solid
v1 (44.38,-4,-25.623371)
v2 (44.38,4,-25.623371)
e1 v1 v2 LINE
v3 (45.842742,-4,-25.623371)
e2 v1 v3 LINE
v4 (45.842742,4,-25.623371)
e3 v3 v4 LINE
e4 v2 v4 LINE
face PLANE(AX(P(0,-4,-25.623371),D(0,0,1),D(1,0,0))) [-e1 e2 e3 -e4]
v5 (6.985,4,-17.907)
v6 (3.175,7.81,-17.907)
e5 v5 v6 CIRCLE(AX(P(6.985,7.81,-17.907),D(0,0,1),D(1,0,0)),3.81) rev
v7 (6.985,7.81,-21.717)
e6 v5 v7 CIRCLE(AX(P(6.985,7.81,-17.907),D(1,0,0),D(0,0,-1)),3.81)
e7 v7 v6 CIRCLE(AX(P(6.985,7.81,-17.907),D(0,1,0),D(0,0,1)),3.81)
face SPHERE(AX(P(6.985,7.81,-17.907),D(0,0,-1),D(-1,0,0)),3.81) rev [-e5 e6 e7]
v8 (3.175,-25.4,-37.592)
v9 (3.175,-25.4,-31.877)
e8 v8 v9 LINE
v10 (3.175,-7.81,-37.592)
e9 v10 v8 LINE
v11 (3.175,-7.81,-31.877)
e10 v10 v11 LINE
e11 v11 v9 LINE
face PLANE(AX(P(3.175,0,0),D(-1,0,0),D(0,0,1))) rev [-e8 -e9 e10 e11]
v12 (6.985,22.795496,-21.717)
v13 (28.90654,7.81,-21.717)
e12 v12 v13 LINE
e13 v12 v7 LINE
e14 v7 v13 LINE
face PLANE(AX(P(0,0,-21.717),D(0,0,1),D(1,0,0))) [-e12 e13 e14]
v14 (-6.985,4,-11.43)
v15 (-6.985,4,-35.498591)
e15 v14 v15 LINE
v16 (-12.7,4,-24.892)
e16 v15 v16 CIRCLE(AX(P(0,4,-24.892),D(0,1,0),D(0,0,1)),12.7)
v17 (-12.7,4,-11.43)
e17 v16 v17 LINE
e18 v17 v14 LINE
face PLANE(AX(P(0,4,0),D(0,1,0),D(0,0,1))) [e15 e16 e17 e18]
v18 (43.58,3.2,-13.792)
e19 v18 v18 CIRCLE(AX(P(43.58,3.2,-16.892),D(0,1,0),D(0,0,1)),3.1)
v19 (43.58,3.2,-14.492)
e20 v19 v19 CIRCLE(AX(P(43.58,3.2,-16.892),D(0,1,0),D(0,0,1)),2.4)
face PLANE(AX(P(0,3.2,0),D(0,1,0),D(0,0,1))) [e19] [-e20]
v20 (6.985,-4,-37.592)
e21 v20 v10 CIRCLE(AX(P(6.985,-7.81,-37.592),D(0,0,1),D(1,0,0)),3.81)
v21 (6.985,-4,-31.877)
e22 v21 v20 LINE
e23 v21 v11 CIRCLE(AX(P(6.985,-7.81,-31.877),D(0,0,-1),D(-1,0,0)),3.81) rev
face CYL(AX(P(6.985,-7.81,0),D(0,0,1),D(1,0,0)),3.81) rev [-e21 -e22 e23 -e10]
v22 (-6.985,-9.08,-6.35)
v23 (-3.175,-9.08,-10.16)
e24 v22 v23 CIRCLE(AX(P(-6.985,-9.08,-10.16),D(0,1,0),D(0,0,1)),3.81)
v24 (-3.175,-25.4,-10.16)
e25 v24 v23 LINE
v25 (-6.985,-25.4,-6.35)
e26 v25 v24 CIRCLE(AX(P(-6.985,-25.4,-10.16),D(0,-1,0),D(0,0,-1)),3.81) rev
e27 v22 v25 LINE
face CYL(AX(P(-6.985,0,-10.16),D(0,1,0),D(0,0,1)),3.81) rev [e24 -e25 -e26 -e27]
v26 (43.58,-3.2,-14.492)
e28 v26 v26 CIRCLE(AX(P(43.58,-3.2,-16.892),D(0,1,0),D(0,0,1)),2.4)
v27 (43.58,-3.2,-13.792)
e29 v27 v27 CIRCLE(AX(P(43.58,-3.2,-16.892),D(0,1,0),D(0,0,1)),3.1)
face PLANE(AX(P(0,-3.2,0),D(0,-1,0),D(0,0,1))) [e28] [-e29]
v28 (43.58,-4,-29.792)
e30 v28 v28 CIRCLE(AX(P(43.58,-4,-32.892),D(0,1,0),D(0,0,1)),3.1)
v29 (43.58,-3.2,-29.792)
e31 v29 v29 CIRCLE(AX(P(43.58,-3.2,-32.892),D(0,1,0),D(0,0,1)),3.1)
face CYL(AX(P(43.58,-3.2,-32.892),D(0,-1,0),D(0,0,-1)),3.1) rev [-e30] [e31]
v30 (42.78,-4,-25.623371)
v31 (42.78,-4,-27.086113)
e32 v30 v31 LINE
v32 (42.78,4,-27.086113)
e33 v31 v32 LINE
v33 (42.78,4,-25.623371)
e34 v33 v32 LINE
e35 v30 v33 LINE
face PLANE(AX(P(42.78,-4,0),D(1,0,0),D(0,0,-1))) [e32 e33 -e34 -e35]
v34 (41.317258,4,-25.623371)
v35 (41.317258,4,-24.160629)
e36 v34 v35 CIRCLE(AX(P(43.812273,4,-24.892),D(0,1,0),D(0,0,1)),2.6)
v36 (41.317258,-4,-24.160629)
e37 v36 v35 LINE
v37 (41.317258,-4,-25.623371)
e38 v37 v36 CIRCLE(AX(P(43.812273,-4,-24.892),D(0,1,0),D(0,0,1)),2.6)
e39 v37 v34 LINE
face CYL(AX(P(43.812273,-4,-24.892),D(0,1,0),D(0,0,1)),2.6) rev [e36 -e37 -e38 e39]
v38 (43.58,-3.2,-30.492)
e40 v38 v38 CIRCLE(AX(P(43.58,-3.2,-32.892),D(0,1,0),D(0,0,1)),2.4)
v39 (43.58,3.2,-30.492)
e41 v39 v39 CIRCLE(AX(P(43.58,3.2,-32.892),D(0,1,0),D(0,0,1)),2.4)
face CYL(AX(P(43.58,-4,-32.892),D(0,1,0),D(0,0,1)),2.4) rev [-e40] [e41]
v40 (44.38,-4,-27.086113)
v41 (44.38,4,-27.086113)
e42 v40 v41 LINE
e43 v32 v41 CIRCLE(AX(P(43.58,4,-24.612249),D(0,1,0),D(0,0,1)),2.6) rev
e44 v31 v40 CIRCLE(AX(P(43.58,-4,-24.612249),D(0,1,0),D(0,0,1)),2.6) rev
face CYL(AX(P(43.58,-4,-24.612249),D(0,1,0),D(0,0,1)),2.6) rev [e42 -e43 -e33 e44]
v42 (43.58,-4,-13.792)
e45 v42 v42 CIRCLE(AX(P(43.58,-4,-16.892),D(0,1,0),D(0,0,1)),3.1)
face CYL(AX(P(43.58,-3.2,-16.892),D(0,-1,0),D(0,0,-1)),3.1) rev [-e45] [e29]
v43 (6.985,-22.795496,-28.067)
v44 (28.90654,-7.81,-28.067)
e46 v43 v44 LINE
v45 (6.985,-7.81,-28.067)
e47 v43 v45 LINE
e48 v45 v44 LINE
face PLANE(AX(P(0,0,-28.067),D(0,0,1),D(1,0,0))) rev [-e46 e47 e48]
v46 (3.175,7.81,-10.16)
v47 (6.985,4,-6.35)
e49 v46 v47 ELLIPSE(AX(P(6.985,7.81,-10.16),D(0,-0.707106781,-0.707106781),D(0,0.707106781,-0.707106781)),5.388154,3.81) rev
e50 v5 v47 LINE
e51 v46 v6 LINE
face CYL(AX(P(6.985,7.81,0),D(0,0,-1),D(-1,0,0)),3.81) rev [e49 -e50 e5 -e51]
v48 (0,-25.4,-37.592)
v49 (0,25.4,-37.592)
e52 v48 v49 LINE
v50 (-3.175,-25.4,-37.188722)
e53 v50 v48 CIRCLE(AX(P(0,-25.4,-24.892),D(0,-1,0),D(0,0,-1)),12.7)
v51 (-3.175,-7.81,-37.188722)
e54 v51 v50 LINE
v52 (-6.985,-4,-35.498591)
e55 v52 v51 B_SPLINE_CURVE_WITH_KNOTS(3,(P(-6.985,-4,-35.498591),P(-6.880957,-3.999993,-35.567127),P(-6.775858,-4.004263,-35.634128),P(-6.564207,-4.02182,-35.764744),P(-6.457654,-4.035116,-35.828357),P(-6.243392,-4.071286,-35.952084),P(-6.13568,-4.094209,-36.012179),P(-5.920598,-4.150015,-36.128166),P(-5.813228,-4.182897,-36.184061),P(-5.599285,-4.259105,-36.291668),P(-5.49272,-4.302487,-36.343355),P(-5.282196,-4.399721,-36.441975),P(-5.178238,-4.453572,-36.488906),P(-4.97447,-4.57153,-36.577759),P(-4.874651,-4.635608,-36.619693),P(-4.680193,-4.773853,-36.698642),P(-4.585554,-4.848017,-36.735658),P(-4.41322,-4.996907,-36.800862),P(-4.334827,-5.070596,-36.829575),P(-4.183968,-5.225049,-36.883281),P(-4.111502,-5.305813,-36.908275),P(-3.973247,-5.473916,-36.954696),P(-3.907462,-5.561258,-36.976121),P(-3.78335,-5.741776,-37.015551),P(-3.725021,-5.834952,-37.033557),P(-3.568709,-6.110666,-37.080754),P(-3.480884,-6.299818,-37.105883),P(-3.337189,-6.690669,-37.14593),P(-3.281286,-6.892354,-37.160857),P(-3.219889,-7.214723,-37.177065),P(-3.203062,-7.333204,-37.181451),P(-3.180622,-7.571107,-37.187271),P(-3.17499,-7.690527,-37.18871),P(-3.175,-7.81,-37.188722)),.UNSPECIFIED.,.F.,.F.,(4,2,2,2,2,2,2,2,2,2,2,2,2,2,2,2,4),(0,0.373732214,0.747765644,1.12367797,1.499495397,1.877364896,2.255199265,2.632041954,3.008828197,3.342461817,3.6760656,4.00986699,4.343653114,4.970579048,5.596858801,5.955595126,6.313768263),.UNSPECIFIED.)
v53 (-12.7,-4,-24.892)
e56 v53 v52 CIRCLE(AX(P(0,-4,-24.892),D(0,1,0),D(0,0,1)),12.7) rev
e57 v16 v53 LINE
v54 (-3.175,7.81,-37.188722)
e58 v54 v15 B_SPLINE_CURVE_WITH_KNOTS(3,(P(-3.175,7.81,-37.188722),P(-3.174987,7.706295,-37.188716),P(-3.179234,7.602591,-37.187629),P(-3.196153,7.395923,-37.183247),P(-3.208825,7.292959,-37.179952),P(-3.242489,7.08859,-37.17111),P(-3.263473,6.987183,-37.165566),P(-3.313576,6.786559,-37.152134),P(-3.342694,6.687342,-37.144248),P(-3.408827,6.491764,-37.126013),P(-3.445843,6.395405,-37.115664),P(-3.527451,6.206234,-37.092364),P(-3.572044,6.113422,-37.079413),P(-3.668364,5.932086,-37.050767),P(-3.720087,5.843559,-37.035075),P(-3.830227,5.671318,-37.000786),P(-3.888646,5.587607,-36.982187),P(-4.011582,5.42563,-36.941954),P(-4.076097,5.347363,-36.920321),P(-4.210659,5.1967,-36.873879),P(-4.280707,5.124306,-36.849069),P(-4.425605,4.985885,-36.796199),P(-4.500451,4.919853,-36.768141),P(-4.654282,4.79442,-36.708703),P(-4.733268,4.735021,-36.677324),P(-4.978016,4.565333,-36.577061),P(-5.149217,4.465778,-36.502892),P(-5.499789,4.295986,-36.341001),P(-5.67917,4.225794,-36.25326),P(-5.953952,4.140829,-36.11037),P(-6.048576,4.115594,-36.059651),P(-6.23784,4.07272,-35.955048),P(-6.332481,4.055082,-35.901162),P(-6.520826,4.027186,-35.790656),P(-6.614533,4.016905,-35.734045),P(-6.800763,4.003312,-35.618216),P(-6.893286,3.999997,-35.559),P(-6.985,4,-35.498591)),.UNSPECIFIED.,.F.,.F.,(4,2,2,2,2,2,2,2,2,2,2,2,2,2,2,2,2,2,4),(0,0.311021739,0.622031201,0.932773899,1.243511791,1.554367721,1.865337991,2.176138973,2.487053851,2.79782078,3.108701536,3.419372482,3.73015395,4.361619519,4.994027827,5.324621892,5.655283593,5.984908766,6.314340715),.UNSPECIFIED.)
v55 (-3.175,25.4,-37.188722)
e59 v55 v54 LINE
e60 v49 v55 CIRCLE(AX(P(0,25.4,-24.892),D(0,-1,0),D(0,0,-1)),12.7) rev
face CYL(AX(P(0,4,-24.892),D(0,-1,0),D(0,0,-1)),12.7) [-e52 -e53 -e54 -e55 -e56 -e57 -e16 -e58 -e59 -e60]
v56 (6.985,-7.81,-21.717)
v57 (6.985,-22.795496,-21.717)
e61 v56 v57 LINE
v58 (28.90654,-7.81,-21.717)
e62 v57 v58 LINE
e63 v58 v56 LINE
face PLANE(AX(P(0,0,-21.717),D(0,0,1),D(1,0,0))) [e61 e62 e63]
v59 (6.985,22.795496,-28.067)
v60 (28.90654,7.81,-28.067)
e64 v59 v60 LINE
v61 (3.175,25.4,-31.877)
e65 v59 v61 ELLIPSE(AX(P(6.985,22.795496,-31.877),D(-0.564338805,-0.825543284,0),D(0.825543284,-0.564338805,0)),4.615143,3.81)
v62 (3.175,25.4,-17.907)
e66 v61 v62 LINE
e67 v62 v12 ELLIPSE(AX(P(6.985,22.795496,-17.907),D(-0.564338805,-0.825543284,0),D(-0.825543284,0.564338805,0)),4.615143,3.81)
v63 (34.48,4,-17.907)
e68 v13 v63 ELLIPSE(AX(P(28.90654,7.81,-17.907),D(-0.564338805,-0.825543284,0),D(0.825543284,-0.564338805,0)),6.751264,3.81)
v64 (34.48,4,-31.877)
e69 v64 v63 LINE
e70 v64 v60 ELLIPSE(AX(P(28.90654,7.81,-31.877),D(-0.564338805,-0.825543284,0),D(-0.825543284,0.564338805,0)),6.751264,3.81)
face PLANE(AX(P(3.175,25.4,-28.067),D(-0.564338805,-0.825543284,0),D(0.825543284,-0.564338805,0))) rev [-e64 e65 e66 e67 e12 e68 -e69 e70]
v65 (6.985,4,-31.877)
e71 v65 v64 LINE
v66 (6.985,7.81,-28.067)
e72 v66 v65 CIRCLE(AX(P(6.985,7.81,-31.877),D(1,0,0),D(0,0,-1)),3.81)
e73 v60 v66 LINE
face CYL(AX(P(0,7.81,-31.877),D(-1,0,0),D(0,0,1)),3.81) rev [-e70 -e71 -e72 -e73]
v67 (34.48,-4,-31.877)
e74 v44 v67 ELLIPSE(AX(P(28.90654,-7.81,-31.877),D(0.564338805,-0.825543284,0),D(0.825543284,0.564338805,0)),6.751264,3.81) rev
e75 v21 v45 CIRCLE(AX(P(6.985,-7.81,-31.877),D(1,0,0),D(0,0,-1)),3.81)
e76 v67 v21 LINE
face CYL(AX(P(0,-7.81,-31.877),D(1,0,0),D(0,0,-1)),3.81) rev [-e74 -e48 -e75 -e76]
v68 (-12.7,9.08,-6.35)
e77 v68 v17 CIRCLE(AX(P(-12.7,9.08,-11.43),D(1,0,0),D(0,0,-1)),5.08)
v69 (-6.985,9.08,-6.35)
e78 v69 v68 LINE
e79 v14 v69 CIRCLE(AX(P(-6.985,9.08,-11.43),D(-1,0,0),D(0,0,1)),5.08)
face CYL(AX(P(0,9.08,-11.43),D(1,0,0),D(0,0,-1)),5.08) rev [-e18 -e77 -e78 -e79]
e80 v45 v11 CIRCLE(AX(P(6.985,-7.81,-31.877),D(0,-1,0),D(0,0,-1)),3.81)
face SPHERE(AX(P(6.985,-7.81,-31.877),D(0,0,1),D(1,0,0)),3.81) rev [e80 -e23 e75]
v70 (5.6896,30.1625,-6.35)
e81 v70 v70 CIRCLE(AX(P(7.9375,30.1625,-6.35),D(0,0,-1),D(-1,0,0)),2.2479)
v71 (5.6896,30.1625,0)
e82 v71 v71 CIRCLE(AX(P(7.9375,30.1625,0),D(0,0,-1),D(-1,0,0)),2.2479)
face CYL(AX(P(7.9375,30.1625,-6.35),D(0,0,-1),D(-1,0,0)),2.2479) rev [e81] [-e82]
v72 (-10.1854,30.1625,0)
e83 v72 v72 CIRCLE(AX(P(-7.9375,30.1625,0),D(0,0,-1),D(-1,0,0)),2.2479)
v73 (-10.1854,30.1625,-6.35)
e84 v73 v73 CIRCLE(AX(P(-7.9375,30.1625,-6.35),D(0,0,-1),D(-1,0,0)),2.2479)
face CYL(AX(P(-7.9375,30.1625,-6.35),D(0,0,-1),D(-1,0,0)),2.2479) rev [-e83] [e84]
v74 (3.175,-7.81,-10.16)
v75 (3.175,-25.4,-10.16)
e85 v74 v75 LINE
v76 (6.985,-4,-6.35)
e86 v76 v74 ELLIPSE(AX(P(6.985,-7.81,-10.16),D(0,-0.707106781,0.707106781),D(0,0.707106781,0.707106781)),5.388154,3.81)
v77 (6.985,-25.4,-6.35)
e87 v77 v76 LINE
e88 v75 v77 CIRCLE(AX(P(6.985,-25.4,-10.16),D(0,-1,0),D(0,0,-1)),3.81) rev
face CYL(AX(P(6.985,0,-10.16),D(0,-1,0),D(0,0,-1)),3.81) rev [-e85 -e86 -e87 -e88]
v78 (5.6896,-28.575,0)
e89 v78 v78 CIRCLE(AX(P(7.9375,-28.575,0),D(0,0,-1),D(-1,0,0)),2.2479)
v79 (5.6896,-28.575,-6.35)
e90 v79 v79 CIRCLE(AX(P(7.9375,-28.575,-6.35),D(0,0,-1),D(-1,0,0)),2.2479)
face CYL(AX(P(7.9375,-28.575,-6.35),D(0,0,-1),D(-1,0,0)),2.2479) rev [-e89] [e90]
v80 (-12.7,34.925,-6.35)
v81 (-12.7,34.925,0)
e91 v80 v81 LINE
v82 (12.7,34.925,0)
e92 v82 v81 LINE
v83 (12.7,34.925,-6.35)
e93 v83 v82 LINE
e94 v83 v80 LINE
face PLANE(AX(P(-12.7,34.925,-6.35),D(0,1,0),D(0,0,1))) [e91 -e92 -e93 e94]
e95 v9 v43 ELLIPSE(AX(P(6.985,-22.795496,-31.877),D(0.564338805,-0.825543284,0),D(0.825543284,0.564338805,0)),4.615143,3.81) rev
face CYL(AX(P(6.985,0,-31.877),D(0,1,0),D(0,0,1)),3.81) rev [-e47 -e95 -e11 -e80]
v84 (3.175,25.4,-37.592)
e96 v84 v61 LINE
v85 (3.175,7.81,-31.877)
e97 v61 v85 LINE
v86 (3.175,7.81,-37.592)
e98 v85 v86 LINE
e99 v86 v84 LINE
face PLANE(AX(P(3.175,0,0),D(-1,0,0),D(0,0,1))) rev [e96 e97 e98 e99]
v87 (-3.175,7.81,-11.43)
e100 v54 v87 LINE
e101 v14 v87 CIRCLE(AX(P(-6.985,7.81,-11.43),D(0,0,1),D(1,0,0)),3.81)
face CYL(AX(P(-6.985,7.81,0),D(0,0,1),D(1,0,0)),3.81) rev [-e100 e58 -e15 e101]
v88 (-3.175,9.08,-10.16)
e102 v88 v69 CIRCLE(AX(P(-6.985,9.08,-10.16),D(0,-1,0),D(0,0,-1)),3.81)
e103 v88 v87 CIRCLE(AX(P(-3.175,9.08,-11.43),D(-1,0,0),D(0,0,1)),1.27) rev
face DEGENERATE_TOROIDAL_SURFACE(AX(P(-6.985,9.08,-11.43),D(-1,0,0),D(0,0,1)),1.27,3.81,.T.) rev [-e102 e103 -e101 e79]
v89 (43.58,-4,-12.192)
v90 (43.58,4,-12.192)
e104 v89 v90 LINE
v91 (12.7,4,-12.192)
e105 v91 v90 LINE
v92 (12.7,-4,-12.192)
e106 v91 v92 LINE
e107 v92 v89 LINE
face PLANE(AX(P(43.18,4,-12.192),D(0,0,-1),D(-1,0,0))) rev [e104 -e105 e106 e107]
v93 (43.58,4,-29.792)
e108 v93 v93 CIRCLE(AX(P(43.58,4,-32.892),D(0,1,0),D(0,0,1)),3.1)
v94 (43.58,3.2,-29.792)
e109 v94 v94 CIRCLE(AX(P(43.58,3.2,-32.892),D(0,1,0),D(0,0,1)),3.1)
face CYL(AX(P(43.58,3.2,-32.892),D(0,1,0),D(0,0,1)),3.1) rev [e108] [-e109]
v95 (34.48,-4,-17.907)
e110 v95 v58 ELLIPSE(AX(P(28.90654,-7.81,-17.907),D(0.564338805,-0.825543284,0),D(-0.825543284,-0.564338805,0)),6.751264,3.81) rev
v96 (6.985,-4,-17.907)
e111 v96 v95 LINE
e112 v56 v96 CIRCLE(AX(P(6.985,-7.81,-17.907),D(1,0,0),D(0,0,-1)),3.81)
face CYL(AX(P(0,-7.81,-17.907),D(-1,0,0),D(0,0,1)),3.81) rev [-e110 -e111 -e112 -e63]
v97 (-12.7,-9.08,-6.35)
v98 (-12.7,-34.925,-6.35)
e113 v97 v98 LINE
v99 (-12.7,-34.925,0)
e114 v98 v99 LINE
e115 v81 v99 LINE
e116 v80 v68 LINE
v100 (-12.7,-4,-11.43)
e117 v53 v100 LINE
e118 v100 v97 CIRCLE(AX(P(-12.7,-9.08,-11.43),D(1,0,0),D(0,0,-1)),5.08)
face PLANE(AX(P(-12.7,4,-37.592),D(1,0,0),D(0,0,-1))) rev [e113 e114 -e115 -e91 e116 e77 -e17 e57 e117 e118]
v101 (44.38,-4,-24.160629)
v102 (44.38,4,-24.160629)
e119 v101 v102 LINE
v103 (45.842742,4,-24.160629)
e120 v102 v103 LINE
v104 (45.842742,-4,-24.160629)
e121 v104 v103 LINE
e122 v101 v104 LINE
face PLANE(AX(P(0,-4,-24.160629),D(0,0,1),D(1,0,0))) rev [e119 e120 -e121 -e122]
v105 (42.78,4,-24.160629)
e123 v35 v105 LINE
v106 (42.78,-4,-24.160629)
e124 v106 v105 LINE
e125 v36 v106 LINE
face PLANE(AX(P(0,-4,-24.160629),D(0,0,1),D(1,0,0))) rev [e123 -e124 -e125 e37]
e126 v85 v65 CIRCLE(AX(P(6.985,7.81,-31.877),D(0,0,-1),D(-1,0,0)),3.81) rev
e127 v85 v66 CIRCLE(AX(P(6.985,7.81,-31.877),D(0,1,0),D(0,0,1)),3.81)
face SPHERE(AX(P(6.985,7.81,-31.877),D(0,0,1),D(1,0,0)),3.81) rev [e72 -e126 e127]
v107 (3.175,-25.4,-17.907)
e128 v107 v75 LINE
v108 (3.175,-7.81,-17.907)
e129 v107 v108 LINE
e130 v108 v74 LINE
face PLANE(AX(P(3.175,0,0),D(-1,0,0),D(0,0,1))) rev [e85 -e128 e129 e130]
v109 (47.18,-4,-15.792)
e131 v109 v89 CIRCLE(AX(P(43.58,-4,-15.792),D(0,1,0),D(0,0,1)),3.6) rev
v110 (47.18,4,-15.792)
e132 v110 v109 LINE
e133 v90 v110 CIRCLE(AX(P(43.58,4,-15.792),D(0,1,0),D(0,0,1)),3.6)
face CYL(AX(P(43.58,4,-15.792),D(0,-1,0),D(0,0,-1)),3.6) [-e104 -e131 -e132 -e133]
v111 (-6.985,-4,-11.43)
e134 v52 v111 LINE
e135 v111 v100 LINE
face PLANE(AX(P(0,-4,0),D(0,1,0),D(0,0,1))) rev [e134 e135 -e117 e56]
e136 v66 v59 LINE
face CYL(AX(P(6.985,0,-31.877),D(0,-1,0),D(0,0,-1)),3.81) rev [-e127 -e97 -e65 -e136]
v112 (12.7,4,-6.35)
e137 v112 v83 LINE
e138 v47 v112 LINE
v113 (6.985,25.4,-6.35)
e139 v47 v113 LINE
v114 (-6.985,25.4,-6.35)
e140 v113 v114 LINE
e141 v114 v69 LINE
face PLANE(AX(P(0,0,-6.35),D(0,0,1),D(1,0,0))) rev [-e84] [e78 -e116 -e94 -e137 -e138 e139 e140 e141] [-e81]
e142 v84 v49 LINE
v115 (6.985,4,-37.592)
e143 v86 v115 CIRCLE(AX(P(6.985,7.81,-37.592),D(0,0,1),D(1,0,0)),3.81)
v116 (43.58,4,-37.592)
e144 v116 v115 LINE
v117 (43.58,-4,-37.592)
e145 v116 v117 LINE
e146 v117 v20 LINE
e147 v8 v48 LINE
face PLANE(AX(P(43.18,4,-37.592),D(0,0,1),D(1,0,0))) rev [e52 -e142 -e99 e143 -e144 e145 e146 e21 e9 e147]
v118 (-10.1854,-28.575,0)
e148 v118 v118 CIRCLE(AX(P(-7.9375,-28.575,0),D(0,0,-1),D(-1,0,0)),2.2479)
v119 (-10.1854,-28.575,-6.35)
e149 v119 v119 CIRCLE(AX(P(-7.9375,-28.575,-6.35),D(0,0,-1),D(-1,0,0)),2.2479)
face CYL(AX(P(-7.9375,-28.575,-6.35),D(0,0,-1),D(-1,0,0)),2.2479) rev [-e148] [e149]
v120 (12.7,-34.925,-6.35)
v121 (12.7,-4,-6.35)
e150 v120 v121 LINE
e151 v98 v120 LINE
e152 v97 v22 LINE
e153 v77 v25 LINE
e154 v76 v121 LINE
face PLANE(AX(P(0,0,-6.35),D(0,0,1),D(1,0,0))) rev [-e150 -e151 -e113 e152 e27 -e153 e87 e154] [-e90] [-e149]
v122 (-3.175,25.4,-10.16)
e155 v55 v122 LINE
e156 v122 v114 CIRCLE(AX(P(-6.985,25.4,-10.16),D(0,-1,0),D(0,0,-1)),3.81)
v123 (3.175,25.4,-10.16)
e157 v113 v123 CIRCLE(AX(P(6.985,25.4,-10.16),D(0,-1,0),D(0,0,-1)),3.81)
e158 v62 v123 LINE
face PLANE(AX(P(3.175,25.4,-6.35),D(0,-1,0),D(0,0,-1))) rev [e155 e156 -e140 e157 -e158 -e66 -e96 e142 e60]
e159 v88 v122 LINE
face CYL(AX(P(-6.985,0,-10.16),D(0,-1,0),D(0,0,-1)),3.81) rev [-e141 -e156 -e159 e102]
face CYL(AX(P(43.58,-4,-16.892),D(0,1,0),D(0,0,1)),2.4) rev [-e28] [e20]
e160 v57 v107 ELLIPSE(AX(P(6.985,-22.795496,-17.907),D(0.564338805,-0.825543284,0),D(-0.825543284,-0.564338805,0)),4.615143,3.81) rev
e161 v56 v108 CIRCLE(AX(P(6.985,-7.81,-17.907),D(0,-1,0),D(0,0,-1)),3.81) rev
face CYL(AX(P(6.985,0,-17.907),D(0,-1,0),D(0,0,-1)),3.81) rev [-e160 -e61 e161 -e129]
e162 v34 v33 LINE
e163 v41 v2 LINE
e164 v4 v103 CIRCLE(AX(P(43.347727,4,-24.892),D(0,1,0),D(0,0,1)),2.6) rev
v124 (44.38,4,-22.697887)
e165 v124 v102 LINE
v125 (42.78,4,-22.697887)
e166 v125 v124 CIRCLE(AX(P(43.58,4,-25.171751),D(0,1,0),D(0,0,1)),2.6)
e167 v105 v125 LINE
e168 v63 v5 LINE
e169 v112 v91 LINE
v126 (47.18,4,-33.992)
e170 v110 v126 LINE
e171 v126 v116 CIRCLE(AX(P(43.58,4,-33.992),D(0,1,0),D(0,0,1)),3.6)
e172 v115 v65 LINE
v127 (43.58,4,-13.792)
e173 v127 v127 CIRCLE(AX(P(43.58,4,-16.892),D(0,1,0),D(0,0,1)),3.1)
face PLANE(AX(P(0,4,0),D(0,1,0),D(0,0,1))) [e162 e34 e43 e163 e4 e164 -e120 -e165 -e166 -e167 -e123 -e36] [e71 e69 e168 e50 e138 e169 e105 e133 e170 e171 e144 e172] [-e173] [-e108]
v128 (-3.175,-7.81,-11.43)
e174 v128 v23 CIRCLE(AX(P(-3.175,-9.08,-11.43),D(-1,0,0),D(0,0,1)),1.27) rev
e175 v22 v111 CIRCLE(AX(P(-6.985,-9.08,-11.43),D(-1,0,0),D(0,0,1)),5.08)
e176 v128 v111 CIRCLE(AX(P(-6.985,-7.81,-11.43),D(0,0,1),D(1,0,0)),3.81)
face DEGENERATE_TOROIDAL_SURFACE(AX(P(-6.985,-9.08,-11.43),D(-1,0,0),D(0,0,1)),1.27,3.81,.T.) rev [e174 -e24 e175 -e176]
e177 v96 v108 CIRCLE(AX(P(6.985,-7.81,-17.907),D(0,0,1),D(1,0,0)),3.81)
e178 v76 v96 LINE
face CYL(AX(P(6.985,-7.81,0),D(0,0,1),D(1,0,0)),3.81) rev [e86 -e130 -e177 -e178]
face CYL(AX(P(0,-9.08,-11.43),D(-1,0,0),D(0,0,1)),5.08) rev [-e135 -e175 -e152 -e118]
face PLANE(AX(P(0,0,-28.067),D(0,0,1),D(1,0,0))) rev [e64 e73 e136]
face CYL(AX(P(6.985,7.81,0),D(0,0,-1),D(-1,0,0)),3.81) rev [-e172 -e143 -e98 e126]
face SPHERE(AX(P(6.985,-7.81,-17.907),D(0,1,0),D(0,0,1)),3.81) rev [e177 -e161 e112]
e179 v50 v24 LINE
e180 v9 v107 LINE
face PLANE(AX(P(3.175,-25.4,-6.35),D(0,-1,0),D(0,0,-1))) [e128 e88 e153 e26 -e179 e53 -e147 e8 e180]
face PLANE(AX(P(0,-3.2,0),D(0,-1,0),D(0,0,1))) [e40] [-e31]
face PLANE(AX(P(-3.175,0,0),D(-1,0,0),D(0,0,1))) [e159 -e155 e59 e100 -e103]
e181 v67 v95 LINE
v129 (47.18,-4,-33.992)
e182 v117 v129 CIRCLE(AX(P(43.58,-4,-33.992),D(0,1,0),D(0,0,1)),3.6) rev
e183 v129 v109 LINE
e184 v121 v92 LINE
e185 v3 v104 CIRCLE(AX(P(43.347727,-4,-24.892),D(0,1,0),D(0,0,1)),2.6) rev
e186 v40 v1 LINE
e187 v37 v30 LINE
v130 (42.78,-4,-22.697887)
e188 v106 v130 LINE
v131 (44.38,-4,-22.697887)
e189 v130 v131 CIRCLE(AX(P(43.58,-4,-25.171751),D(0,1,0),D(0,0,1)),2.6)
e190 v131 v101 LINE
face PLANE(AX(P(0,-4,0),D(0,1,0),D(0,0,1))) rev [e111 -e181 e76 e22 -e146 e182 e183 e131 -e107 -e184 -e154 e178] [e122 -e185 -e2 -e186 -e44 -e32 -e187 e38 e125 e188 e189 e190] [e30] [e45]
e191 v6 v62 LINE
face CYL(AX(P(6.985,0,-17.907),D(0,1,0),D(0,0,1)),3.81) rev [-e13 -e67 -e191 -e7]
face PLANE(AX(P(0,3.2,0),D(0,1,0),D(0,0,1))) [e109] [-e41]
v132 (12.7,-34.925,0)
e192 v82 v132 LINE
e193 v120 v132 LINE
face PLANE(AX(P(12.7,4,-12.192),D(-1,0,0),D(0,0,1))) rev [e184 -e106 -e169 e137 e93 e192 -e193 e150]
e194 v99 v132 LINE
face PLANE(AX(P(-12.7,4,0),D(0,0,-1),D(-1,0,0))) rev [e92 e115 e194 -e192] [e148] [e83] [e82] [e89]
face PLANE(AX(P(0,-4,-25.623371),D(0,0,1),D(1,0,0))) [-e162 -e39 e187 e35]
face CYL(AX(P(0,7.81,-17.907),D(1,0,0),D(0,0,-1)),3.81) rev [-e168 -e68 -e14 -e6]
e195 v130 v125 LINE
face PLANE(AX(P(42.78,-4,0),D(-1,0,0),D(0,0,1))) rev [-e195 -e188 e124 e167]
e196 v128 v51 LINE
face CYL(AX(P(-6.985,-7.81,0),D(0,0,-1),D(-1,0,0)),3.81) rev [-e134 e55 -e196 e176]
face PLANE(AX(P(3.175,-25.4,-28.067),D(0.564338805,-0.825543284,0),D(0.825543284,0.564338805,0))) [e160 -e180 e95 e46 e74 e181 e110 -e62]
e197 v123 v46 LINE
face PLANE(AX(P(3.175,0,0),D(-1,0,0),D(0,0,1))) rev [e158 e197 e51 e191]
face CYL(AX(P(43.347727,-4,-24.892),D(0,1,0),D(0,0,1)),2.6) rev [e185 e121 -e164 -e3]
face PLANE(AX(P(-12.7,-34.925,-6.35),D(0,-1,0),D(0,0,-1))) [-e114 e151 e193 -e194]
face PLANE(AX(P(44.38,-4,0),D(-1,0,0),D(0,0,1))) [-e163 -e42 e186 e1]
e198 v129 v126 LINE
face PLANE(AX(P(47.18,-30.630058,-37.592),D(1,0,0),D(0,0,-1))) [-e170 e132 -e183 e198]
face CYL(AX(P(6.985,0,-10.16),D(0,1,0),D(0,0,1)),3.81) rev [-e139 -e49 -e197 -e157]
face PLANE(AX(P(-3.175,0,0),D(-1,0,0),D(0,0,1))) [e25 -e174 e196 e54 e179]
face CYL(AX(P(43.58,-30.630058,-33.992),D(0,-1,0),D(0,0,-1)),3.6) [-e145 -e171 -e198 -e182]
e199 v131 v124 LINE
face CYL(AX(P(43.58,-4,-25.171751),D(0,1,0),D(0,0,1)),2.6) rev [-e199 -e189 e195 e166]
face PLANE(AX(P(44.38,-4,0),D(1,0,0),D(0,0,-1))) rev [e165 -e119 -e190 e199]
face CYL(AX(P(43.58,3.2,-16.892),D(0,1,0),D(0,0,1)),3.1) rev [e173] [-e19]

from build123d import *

# Parameters (mm, degrees)
BOSS_EXTRUDE1_DEPTH   = 4
SKETCH2_W             = 8
SKETCH2_H             = 25.4
BOSS_EXTRUDE2_DEPTH   = 8
SKETCH4_R             = 2.4
CUT_EXTRUDE1_DEPTH    = 61.853191075
SKETCH4_3_R           = 3.1
SKETCH4_3_R_2         = 2.4
CUT_EXTRUDE2_DEPTH    = 0.8
SKETCH5_W             = 25.4
SKETCH5_H             = 69.85
BOSS_EXTRUDE3_DEPTH   = 6.35
SKETCH8_W             = 31.242
SKETCH8_H             = 21.4
BOSS_EXTRUDE5_DEPTH   = 3.175
BOSS_EXTRUDE6_DEPTH   = 3.175
FILLET4_R             = 3.81
FILLET1_START         = -12.7
FILLET1_DEPTH         = 9.117148006
FILLET1_2_ANGLE       = 90
FILLET1_3_ANGLE       = 90
FILLET2_R             = 3.6
FILLET3_R             = 12.7
F_8_CLEARANCE_HOLE1_D = 4.4958


with BuildPart() as part:
    # Sketch1 → Boss-Extrude1 (new, symmetric)
    with BuildSketch(Plane(origin=(0, 0, 0), x_dir=(1, 0, 0), z_dir=(0, 1, 0))):
        Polygon((-12.7, 0), (12.7, 0), (12.7, 6.35), (12.7, 12.192), (43.18, 12.192), (43.18, 37.592), (-12.7, 37.592), (-12.7, 6.35), align=None)
    extrude(amount=BOSS_EXTRUDE1_DEPTH, both=True)

    # Sketch2 → Boss-Extrude2 (add)
    with BuildSketch(Plane(origin=(0, 4, 0), x_dir=(1, 0, 0), z_dir=(0, 1, 0))):
        with Locations((43.18, 24.892)):
            Rectangle(SKETCH2_W, SKETCH2_H)
    extrude(amount=-BOSS_EXTRUDE2_DEPTH)

    # Sketch4 → Cut-Extrude1 (cut, through all)
    with BuildSketch(Plane(origin=(0, 4, 0), x_dir=(1, 0, 0), z_dir=(0, 1, 0))):
        with Locations(Location((43.58, 16.892, 0), (0, 0, 270))):
            Circle(SKETCH4_R)
        with BuildLine():
            ThreePointArc((45.8427417, 25.62337085), (45.947727335, 24.892), (45.8427417, 24.16062915))
            Line((45.8427417, 24.16062915), (44.38, 24.16062915))
            Line((44.38, 24.16062915), (44.38, 22.69788745))
            ThreePointArc((44.38, 22.69788745), (43.58, 22.571750825), (42.78, 22.69788745))
            Line((42.78, 22.69788745), (42.78, 24.16062915))
            Line((42.78, 24.16062915), (41.3172583, 24.16062915))
            ThreePointArc((41.3172583, 24.16062915), (41.212272665, 24.892), (41.3172583, 25.62337085))
            Line((41.3172583, 25.62337085), (42.78, 25.62337085))
            Line((42.78, 25.62337085), (42.78, 27.08611255))
            ThreePointArc((42.78, 27.08611255), (43.58, 27.212249175), (44.38, 27.08611255))
            Line((44.38, 27.08611255), (44.38, 25.62337085))
            Line((44.38, 25.62337085), (45.8427417, 25.62337085))
        make_face()
        with Locations(Location((43.58, 32.892, 0), (0, 0, 270))):
            Circle(SKETCH4_R)
        with BuildLine():
            Line((42.78, 27.08611255), (42.78, 25.62337085))
            Line((42.78, 25.62337085), (44.38, 25.62337085))
            Line((44.38, 25.62337085), (44.38, 27.08611255))
            ThreePointArc((44.38, 27.08611255), (43.58, 27.212249175), (42.78, 27.08611255))
        make_face()
    extrude(amount=-CUT_EXTRUDE1_DEPTH, mode=Mode.SUBTRACT)

    # Sketch4<3> → Cut-Extrude2 (cut)
    # profile 1 of 2: a face of its own
    with BuildSketch(Plane(origin=(0, 4, 0), x_dir=(1, 0, 0), z_dir=(0, 1, 0))):
        with Locations(Location((43.58, 16.892, 0), (0, 0, 270))):
            Circle(SKETCH4_3_R)
        with Locations(Location((43.58, 16.892, 0), (0, 0, 270))):
            Circle(SKETCH4_3_R_2, mode=Mode.SUBTRACT)
    # profile 2 of 2: a face of its own
    with BuildSketch(Plane(origin=(0, 4, 0), x_dir=(1, 0, 0), z_dir=(0, 1, 0))):
        with Locations(Location((43.58, 32.892, 0), (0, 0, 270))):
            Circle(SKETCH4_3_R)
        with Locations(Location((43.58, 32.892, 0), (0, 0, 270))):
            Circle(SKETCH4_3_R_2, mode=Mode.SUBTRACT)
    cut_extrude2 = extrude(amount=-CUT_EXTRUDE2_DEPTH, mode=Mode.SUBTRACT)

    # Mirror1: Cut-Extrude2 across plane
    add(cut_extrude2.mirror(Plane.ZX), mode=Mode.SUBTRACT)

    # Sketch5 → Boss-Extrude3 (add)
    with BuildSketch(Plane.XY):
        Rectangle(SKETCH5_W, SKETCH5_H)
    extrude(amount=-BOSS_EXTRUDE3_DEPTH)

    # Sketch8 → Boss-Extrude5 (add, symmetric)
    with BuildSketch(Plane(origin=(0, 0, 0), x_dir=(0, 0, -1), z_dir=(1, 0, 0))):
        with Locations((21.971, 14.7)):
            Rectangle(SKETCH8_W, SKETCH8_H)
    boss_extrude5 = extrude(amount=BOSS_EXTRUDE5_DEPTH, both=True)

    # Sketch9 → Boss-Extrude6 (add, symmetric)
    with BuildSketch(Plane(origin=(0, 0, -24.892), x_dir=(-1, 0, 0), z_dir=(0, 0, -1))):
        Polygon((-3.175, 25.4), (-34.48, 4), (-3.175, 4), align=None)
    boss_extrude6 = extrude(amount=BOSS_EXTRUDE6_DEPTH, both=True)

    # Mirror2: Boss-Extrude5, Boss-Extrude6 across plane
    add(boss_extrude5.mirror(Plane.ZX))
    add(boss_extrude6.mirror(Plane.ZX))

    # Fillet4
    # the kernel refuses this fillet: 3.81 mm, written as the material it adds along each edge
    with BuildSketch(Plane(origin=(6.985, 7.81, -17.907), x_dir=(0, 0, -1), z_dir=(0, -1, 0))) as fillet4_piece_1_section:
        Polygon((0, 0), (FILLET4_R * 1.02, 0), (FILLET4_R * 1.02, -FILLET4_R * 1.02), (0, -FILLET4_R * 1.02), align=None)
    fillet4_piece_1 = extrude(amount=FILLET4_R * 1.02, mode=Mode.PRIVATE)
    fillet4_piece_1 = fillet4_piece_1 - Plane(origin=(6.985, 7.81, -17.907), x_dir=(0.7071067811865477, 0, 0.7071067811865475), z_dir=(0, -1, 0)) * Sphere(FILLET4_R, mode=Mode.PRIVATE)
    add(fillet4_piece_1)
    with BuildSketch(Plane(origin=(6.985, 7.81, -31.877), x_dir=(0, -1, 0), z_dir=(0, 0, 1))) as fillet4_piece_2_section:
        Polygon((0, 0), (FILLET4_R * 1.02, 0), (FILLET4_R * 1.02, -FILLET4_R * 1.02), (0, -FILLET4_R * 1.02), align=None)
    fillet4_piece_2 = extrude(amount=FILLET4_R * 1.02, mode=Mode.PRIVATE)
    fillet4_piece_2 = fillet4_piece_2 - Plane(origin=(6.985, 7.81, -31.877), x_dir=(0.7071067811865475, 0.7071067811865475, 0), z_dir=(0, 0, 1)) * Sphere(FILLET4_R, mode=Mode.PRIVATE)
    add(fillet4_piece_2)
    with BuildSketch(Plane(origin=(6.985, -7.81, -17.907), x_dir=(-1, 0, 0), z_dir=(0, 1, 0))) as fillet4_piece_3_section:
        Polygon((0, 0), (FILLET4_R * 1.02, 0), (FILLET4_R * 1.02, -FILLET4_R * 1.02), (0, -FILLET4_R * 1.02), align=None)
    fillet4_piece_3 = extrude(amount=FILLET4_R * 1.02, mode=Mode.PRIVATE)
    fillet4_piece_3 = fillet4_piece_3 - Plane(origin=(6.985, -7.81, -17.907), x_dir=(0.7071067811865477, 0, 0.7071067811865475), z_dir=(0, 1, 0)) * Sphere(FILLET4_R, mode=Mode.PRIVATE)
    add(fillet4_piece_3)
    with BuildSketch(Plane(origin=(6.985, -7.81, -31.877), x_dir=(-1, 0, 0), z_dir=(0, 0, 1))) as fillet4_piece_4_section:
        Polygon((0, 0), (FILLET4_R * 1.02, 0), (FILLET4_R * 1.02, -FILLET4_R * 1.02), (0, -FILLET4_R * 1.02), align=None)
    fillet4_piece_4 = extrude(amount=FILLET4_R * 1.02, mode=Mode.PRIVATE)
    fillet4_piece_4 = fillet4_piece_4 - Plane(origin=(6.985, -7.81, -31.877), x_dir=(0.7071067811865475, -0.7071067811865475, 0), z_dir=(0, 0, 1)) * Sphere(FILLET4_R, mode=Mode.PRIVATE)
    add(fillet4_piece_4)
    with BuildSketch(Plane(origin=(-3.175, -5.525, -6.35), x_dir=(-1, 0, 0), z_dir=(0, 1, 0)), Plane(origin=(3.175, 5.525, -6.35), x_dir=(1, 0, 0), z_dir=(0, -1, 0))) as fillet4_piece_5:
        with BuildLine():
            CenterArc((FILLET4_R, -FILLET4_R), FILLET4_R, 90, 90)
            Line((0, -FILLET4_R), (0, 0))
            Line((0, 0), (FILLET4_R, 0))
        make_face()
    extrude(amount=30.925)
    with BuildSketch(Plane(origin=(-3.175, 4, -37.592), x_dir=(-1, 0, 0), z_dir=(0, 0, 1))) as fillet4_piece_6:
        with BuildLine():
            CenterArc((FILLET4_R, -FILLET4_R), FILLET4_R, 90, 90)
            Line((0, -FILLET4_R), (0, 0))
            Line((0, 0), (FILLET4_R, 0))
        make_face()
    extrude(amount=31.242)
    with BuildSketch(Plane(origin=(3.175, -5.525, -6.35), x_dir=(1, 0, 0), z_dir=(0, 1, 0)), Plane(origin=(-3.175, 5.525, -6.35), x_dir=(-1, 0, 0), z_dir=(0, -1, 0))) as fillet4_piece_7:
        with BuildLine():
            CenterArc((FILLET4_R, FILLET4_R), FILLET4_R, 180, 90)
            Line((0, FILLET4_R), (0, 0))
            Line((0, 0), (FILLET4_R, 0))
        make_face()
    extrude(amount=30.925)
    with BuildSketch(Plane(origin=(3.175, 4, -17.907), x_dir=(1, 0, 0), z_dir=(0, 0, 1))) as fillet4_piece_8:
        with BuildLine():
            CenterArc((FILLET4_R, FILLET4_R), FILLET4_R, 180, 90)
            Line((0, FILLET4_R), (0, 0))
            Line((0, 0), (FILLET4_R, 0))
        make_face()
    extrude(amount=11.557)
    with BuildSketch(Plane(origin=(3.175, 4, -37.592), x_dir=(1, 0, 0), z_dir=(0, 0, 1))) as fillet4_piece_9:
        with BuildLine():
            CenterArc((FILLET4_R, FILLET4_R), FILLET4_R, 180, 90)
            Line((0, FILLET4_R), (0, 0))
            Line((0, 0), (FILLET4_R, 0))
        make_face()
    extrude(amount=5.715)
    with BuildSketch(Plane(origin=(3.175, 7.81, -21.717), x_dir=(0, 0, 1), z_dir=(0, 1, 0))) as fillet4_piece_10_section:
        with BuildLine():
            CenterArc((FILLET4_R, FILLET4_R), FILLET4_R, 180, 90)
            Line((0, FILLET4_R), (0, 0))
            Line((0, 0), (FILLET4_R, 0))
        make_face()
    fillet4_piece_10 = extrude(amount=27.115, mode=Mode.PRIVATE)
    fillet4_piece_10 = split(fillet4_piece_10, bisect_by=Plane(origin=(11.369936674, 19.797966944, -21.717), z_dir=(-0.5643388045531726, -0.8255432839503305, 0)), keep=Keep.TOP, mode=Mode.PRIVATE)
    add(fillet4_piece_10)
    with BuildSketch(Plane(origin=(44.005, 4, -21.717), x_dir=(0, 0, 1), z_dir=(-1, 0, 0))) as fillet4_piece_11_section:
        with BuildLine():
            CenterArc((FILLET4_R, FILLET4_R), FILLET4_R, 180, 90)
            Line((0, FILLET4_R), (0, 0))
            Line((0, 0), (FILLET4_R, 0))
        make_face()
    fillet4_piece_11 = extrude(amount=37.02, mode=Mode.PRIVATE)
    fillet4_piece_11 = split(fillet4_piece_11, bisect_by=Plane(origin=(40.971494323, -0.437565197, -21.717), z_dir=(-0.5643388045531726, -0.8255432839503305, 0)), keep=Keep.TOP, mode=Mode.PRIVATE)
    add(fillet4_piece_11)
    with BuildSketch(Plane(origin=(3.175, 7.81, -28.067), x_dir=(0, 0, -1), z_dir=(0, 1, 0))) as fillet4_piece_12_section:
        with BuildLine():
            CenterArc((FILLET4_R, -FILLET4_R), FILLET4_R, 90, 90)
            Line((0, -FILLET4_R), (0, 0))
            Line((0, 0), (FILLET4_R, 0))
        make_face()
    fillet4_piece_12 = extrude(amount=27.115, mode=Mode.PRIVATE)
    fillet4_piece_12 = split(fillet4_piece_12, bisect_by=Plane(origin=(11.369936674, 19.797966944, -28.067), z_dir=(-0.5643388045531726, -0.8255432839503305, 0)), keep=Keep.TOP, mode=Mode.PRIVATE)
    add(fillet4_piece_12)
    with BuildSketch(Plane(origin=(44.005, 4, -28.067), x_dir=(0, 0, -1), z_dir=(-1, 0, 0))) as fillet4_piece_13_section:
        with BuildLine():
            CenterArc((FILLET4_R, -FILLET4_R), FILLET4_R, 90, 90)
            Line((0, -FILLET4_R), (0, 0))
            Line((0, 0), (FILLET4_R, 0))
        make_face()
    fillet4_piece_13 = extrude(amount=37.02, mode=Mode.PRIVATE)
    fillet4_piece_13 = split(fillet4_piece_13, bisect_by=Plane(origin=(40.971494323, -0.437565197, -28.067), z_dir=(-0.5643388045531726, -0.8255432839503305, 0)), keep=Keep.TOP, mode=Mode.PRIVATE)
    add(fillet4_piece_13)
    with BuildSketch(Plane(origin=(3.175, -4, -17.907), x_dir=(1, 0, 0), z_dir=(0, 0, 1))) as fillet4_piece_14:
        with BuildLine():
            CenterArc((FILLET4_R, -FILLET4_R), FILLET4_R, 90, 90)
            Line((0, -FILLET4_R), (0, 0))
            Line((0, 0), (FILLET4_R, 0))
        make_face()
    extrude(amount=11.557)
    with BuildSketch(Plane(origin=(-3.175, -4, -37.592), x_dir=(-1, 0, 0), z_dir=(0, 0, 1))) as fillet4_piece_15:
        with BuildLine():
            CenterArc((FILLET4_R, FILLET4_R), FILLET4_R, 180, 90)
            Line((0, FILLET4_R), (0, 0))
            Line((0, 0), (FILLET4_R, 0))
        make_face()
    extrude(amount=31.242)
    with BuildSketch(Plane(origin=(3.175, -4, -37.592), x_dir=(1, 0, 0), z_dir=(0, 0, 1))) as fillet4_piece_16:
        with BuildLine():
            CenterArc((FILLET4_R, -FILLET4_R), FILLET4_R, 90, 90)
            Line((0, -FILLET4_R), (0, 0))
            Line((0, 0), (FILLET4_R, 0))
        make_face()
    extrude(amount=5.715)
    with BuildSketch(Plane(origin=(3.175, -7.81, -28.067), x_dir=(0, 0, -1), z_dir=(0, -1, 0))) as fillet4_piece_17_section:
        with BuildLine():
            CenterArc((FILLET4_R, FILLET4_R), FILLET4_R, 180, 90)
            Line((0, FILLET4_R), (0, 0))
            Line((0, 0), (FILLET4_R, 0))
        make_face()
    fillet4_piece_17 = extrude(amount=27.115, mode=Mode.PRIVATE)
    fillet4_piece_17 = split(fillet4_piece_17, bisect_by=Plane(origin=(11.369936674, -19.797966944, -28.067), z_dir=(-0.5643388045531726, 0.8255432839503305, 0)), keep=Keep.TOP, mode=Mode.PRIVATE)
    add(fillet4_piece_17)
    with BuildSketch(Plane(origin=(44.005, -4, -28.067), x_dir=(0, 0, -1), z_dir=(-1, 0, 0))) as fillet4_piece_18_section:
        with BuildLine():
            CenterArc((FILLET4_R, FILLET4_R), FILLET4_R, 180, 90)
            Line((0, FILLET4_R), (0, 0))
            Line((0, 0), (FILLET4_R, 0))
        make_face()
    fillet4_piece_18 = extrude(amount=37.02, mode=Mode.PRIVATE)
    fillet4_piece_18 = split(fillet4_piece_18, bisect_by=Plane(origin=(40.971494323, 0.437565197, -28.067), z_dir=(-0.5643388045531726, 0.8255432839503305, 0)), keep=Keep.TOP, mode=Mode.PRIVATE)
    add(fillet4_piece_18)
    with BuildSketch(Plane(origin=(3.175, -7.81, -21.717), x_dir=(0, 0, 1), z_dir=(0, -1, 0))) as fillet4_piece_19_section:
        with BuildLine():
            CenterArc((FILLET4_R, -FILLET4_R), FILLET4_R, 90, 90)
            Line((0, -FILLET4_R), (0, 0))
            Line((0, 0), (FILLET4_R, 0))
        make_face()
    fillet4_piece_19 = extrude(amount=27.115, mode=Mode.PRIVATE)
    fillet4_piece_19 = split(fillet4_piece_19, bisect_by=Plane(origin=(11.369936674, -19.797966944, -21.717), z_dir=(-0.5643388045531726, 0.8255432839503305, 0)), keep=Keep.TOP, mode=Mode.PRIVATE)
    add(fillet4_piece_19)
    with BuildSketch(Plane(origin=(44.005, -4, -21.717), x_dir=(0, 0, 1), z_dir=(-1, 0, 0))) as fillet4_piece_20_section:
        with BuildLine():
            CenterArc((FILLET4_R, -FILLET4_R), FILLET4_R, 90, 90)
            Line((0, -FILLET4_R), (0, 0))
            Line((0, 0), (FILLET4_R, 0))
        make_face()
    fillet4_piece_20 = extrude(amount=37.02, mode=Mode.PRIVATE)
    fillet4_piece_20 = split(fillet4_piece_20, bisect_by=Plane(origin=(40.971494323, 0.437565197, -21.717), z_dir=(-0.5643388045531726, 0.8255432839503305, 0)), keep=Keep.TOP, mode=Mode.PRIVATE)
    add(fillet4_piece_20)

    # Fillet1: read off the stored shape, not the designer's step
    # Fillet1 outline → Fillet1 (add)
    with BuildSketch(Plane.YZ.offset(FILLET1_START)):
        with BuildLine():
            ThreePointArc((4, -11.43), (5.487897552, -7.837897552), (9.08, -6.35))
            Line((9.08, -6.35), (4, -6.35))
            Line((4, -6.35), (4, -11.43))
        make_face()
        with BuildLine():
            Line((-4, -6.35), (-9.08, -6.35))
            ThreePointArc((-9.08, -6.35), (-5.487897552, -7.837897552), (-4, -11.43))
            Line((-4, -11.43), (-4, -6.35))
        make_face()
    extrude(amount=FILLET1_DEPTH)

    # Fillet1 2 outline → Fillet1 2 (revolve)
    with BuildSketch(Plane(origin=(0, 9.08, -11.43), x_dir=(0, 0, 1), z_dir=(0, 1, 0))):
        with BuildLine():
            Line((5.08, -3.175), (1.27, -3.175))
            ThreePointArc((1.27, -3.175), (3.964076836, -4.290923164), (5.08, -6.985))
            Line((5.08, -6.985), (5.08, -3.175))
        make_face()
    revolve(axis=Axis((0, 9.08, -11.43), (1, 0, 0)), revolution_arc=FILLET1_2_ANGLE)

    # Fillet1 3 outline → Fillet1 3 (revolve)
    with BuildSketch(Plane(origin=(0, -9.08, -11.43), x_dir=(0, 1, 0), z_dir=(0, 0, -1))):
        with BuildLine():
            Line((5.08, -3.175), (1.27, -3.175))
            ThreePointArc((1.27, -3.175), (3.964076836, -4.290923164), (5.08, -6.985))
            Line((5.08, -6.985), (5.08, -3.175))
        make_face()
    revolve(axis=Axis((0, -9.08, -11.43), (1, 0, 0)), revolution_arc=FILLET1_3_ANGLE)

    # Fillet2
    fillet2_edges = [part.edges().sort_by_distance(p)[0] for p in [
        (47.18, 0, -12.192),
        (47.18, 0, -37.592),
    ]]
    fillet(fillet2_edges, radius=FILLET2_R)

    # Fillet3
    fillet3_edges = [part.edges().sort_by_distance(p)[0] for p in [
        (-12.7, 0, -37.592),
    ]]
    fillet(fillet3_edges, radius=FILLET3_R)

    # #8 Clearance Hole1 (through all)
    with Locations(Plane(origin=(0, 0, -6.35), x_dir=(-1, 0, 0), z_dir=(0, 0, -1))):
        with Locations((7.9375, 30.1625), (-7.9375, 30.1625), (-7.9375, -28.575), (7.9375, -28.575)):
            Hole(F_8_CLEARANCE_HOLE1_D / 2)


solid = part.part
